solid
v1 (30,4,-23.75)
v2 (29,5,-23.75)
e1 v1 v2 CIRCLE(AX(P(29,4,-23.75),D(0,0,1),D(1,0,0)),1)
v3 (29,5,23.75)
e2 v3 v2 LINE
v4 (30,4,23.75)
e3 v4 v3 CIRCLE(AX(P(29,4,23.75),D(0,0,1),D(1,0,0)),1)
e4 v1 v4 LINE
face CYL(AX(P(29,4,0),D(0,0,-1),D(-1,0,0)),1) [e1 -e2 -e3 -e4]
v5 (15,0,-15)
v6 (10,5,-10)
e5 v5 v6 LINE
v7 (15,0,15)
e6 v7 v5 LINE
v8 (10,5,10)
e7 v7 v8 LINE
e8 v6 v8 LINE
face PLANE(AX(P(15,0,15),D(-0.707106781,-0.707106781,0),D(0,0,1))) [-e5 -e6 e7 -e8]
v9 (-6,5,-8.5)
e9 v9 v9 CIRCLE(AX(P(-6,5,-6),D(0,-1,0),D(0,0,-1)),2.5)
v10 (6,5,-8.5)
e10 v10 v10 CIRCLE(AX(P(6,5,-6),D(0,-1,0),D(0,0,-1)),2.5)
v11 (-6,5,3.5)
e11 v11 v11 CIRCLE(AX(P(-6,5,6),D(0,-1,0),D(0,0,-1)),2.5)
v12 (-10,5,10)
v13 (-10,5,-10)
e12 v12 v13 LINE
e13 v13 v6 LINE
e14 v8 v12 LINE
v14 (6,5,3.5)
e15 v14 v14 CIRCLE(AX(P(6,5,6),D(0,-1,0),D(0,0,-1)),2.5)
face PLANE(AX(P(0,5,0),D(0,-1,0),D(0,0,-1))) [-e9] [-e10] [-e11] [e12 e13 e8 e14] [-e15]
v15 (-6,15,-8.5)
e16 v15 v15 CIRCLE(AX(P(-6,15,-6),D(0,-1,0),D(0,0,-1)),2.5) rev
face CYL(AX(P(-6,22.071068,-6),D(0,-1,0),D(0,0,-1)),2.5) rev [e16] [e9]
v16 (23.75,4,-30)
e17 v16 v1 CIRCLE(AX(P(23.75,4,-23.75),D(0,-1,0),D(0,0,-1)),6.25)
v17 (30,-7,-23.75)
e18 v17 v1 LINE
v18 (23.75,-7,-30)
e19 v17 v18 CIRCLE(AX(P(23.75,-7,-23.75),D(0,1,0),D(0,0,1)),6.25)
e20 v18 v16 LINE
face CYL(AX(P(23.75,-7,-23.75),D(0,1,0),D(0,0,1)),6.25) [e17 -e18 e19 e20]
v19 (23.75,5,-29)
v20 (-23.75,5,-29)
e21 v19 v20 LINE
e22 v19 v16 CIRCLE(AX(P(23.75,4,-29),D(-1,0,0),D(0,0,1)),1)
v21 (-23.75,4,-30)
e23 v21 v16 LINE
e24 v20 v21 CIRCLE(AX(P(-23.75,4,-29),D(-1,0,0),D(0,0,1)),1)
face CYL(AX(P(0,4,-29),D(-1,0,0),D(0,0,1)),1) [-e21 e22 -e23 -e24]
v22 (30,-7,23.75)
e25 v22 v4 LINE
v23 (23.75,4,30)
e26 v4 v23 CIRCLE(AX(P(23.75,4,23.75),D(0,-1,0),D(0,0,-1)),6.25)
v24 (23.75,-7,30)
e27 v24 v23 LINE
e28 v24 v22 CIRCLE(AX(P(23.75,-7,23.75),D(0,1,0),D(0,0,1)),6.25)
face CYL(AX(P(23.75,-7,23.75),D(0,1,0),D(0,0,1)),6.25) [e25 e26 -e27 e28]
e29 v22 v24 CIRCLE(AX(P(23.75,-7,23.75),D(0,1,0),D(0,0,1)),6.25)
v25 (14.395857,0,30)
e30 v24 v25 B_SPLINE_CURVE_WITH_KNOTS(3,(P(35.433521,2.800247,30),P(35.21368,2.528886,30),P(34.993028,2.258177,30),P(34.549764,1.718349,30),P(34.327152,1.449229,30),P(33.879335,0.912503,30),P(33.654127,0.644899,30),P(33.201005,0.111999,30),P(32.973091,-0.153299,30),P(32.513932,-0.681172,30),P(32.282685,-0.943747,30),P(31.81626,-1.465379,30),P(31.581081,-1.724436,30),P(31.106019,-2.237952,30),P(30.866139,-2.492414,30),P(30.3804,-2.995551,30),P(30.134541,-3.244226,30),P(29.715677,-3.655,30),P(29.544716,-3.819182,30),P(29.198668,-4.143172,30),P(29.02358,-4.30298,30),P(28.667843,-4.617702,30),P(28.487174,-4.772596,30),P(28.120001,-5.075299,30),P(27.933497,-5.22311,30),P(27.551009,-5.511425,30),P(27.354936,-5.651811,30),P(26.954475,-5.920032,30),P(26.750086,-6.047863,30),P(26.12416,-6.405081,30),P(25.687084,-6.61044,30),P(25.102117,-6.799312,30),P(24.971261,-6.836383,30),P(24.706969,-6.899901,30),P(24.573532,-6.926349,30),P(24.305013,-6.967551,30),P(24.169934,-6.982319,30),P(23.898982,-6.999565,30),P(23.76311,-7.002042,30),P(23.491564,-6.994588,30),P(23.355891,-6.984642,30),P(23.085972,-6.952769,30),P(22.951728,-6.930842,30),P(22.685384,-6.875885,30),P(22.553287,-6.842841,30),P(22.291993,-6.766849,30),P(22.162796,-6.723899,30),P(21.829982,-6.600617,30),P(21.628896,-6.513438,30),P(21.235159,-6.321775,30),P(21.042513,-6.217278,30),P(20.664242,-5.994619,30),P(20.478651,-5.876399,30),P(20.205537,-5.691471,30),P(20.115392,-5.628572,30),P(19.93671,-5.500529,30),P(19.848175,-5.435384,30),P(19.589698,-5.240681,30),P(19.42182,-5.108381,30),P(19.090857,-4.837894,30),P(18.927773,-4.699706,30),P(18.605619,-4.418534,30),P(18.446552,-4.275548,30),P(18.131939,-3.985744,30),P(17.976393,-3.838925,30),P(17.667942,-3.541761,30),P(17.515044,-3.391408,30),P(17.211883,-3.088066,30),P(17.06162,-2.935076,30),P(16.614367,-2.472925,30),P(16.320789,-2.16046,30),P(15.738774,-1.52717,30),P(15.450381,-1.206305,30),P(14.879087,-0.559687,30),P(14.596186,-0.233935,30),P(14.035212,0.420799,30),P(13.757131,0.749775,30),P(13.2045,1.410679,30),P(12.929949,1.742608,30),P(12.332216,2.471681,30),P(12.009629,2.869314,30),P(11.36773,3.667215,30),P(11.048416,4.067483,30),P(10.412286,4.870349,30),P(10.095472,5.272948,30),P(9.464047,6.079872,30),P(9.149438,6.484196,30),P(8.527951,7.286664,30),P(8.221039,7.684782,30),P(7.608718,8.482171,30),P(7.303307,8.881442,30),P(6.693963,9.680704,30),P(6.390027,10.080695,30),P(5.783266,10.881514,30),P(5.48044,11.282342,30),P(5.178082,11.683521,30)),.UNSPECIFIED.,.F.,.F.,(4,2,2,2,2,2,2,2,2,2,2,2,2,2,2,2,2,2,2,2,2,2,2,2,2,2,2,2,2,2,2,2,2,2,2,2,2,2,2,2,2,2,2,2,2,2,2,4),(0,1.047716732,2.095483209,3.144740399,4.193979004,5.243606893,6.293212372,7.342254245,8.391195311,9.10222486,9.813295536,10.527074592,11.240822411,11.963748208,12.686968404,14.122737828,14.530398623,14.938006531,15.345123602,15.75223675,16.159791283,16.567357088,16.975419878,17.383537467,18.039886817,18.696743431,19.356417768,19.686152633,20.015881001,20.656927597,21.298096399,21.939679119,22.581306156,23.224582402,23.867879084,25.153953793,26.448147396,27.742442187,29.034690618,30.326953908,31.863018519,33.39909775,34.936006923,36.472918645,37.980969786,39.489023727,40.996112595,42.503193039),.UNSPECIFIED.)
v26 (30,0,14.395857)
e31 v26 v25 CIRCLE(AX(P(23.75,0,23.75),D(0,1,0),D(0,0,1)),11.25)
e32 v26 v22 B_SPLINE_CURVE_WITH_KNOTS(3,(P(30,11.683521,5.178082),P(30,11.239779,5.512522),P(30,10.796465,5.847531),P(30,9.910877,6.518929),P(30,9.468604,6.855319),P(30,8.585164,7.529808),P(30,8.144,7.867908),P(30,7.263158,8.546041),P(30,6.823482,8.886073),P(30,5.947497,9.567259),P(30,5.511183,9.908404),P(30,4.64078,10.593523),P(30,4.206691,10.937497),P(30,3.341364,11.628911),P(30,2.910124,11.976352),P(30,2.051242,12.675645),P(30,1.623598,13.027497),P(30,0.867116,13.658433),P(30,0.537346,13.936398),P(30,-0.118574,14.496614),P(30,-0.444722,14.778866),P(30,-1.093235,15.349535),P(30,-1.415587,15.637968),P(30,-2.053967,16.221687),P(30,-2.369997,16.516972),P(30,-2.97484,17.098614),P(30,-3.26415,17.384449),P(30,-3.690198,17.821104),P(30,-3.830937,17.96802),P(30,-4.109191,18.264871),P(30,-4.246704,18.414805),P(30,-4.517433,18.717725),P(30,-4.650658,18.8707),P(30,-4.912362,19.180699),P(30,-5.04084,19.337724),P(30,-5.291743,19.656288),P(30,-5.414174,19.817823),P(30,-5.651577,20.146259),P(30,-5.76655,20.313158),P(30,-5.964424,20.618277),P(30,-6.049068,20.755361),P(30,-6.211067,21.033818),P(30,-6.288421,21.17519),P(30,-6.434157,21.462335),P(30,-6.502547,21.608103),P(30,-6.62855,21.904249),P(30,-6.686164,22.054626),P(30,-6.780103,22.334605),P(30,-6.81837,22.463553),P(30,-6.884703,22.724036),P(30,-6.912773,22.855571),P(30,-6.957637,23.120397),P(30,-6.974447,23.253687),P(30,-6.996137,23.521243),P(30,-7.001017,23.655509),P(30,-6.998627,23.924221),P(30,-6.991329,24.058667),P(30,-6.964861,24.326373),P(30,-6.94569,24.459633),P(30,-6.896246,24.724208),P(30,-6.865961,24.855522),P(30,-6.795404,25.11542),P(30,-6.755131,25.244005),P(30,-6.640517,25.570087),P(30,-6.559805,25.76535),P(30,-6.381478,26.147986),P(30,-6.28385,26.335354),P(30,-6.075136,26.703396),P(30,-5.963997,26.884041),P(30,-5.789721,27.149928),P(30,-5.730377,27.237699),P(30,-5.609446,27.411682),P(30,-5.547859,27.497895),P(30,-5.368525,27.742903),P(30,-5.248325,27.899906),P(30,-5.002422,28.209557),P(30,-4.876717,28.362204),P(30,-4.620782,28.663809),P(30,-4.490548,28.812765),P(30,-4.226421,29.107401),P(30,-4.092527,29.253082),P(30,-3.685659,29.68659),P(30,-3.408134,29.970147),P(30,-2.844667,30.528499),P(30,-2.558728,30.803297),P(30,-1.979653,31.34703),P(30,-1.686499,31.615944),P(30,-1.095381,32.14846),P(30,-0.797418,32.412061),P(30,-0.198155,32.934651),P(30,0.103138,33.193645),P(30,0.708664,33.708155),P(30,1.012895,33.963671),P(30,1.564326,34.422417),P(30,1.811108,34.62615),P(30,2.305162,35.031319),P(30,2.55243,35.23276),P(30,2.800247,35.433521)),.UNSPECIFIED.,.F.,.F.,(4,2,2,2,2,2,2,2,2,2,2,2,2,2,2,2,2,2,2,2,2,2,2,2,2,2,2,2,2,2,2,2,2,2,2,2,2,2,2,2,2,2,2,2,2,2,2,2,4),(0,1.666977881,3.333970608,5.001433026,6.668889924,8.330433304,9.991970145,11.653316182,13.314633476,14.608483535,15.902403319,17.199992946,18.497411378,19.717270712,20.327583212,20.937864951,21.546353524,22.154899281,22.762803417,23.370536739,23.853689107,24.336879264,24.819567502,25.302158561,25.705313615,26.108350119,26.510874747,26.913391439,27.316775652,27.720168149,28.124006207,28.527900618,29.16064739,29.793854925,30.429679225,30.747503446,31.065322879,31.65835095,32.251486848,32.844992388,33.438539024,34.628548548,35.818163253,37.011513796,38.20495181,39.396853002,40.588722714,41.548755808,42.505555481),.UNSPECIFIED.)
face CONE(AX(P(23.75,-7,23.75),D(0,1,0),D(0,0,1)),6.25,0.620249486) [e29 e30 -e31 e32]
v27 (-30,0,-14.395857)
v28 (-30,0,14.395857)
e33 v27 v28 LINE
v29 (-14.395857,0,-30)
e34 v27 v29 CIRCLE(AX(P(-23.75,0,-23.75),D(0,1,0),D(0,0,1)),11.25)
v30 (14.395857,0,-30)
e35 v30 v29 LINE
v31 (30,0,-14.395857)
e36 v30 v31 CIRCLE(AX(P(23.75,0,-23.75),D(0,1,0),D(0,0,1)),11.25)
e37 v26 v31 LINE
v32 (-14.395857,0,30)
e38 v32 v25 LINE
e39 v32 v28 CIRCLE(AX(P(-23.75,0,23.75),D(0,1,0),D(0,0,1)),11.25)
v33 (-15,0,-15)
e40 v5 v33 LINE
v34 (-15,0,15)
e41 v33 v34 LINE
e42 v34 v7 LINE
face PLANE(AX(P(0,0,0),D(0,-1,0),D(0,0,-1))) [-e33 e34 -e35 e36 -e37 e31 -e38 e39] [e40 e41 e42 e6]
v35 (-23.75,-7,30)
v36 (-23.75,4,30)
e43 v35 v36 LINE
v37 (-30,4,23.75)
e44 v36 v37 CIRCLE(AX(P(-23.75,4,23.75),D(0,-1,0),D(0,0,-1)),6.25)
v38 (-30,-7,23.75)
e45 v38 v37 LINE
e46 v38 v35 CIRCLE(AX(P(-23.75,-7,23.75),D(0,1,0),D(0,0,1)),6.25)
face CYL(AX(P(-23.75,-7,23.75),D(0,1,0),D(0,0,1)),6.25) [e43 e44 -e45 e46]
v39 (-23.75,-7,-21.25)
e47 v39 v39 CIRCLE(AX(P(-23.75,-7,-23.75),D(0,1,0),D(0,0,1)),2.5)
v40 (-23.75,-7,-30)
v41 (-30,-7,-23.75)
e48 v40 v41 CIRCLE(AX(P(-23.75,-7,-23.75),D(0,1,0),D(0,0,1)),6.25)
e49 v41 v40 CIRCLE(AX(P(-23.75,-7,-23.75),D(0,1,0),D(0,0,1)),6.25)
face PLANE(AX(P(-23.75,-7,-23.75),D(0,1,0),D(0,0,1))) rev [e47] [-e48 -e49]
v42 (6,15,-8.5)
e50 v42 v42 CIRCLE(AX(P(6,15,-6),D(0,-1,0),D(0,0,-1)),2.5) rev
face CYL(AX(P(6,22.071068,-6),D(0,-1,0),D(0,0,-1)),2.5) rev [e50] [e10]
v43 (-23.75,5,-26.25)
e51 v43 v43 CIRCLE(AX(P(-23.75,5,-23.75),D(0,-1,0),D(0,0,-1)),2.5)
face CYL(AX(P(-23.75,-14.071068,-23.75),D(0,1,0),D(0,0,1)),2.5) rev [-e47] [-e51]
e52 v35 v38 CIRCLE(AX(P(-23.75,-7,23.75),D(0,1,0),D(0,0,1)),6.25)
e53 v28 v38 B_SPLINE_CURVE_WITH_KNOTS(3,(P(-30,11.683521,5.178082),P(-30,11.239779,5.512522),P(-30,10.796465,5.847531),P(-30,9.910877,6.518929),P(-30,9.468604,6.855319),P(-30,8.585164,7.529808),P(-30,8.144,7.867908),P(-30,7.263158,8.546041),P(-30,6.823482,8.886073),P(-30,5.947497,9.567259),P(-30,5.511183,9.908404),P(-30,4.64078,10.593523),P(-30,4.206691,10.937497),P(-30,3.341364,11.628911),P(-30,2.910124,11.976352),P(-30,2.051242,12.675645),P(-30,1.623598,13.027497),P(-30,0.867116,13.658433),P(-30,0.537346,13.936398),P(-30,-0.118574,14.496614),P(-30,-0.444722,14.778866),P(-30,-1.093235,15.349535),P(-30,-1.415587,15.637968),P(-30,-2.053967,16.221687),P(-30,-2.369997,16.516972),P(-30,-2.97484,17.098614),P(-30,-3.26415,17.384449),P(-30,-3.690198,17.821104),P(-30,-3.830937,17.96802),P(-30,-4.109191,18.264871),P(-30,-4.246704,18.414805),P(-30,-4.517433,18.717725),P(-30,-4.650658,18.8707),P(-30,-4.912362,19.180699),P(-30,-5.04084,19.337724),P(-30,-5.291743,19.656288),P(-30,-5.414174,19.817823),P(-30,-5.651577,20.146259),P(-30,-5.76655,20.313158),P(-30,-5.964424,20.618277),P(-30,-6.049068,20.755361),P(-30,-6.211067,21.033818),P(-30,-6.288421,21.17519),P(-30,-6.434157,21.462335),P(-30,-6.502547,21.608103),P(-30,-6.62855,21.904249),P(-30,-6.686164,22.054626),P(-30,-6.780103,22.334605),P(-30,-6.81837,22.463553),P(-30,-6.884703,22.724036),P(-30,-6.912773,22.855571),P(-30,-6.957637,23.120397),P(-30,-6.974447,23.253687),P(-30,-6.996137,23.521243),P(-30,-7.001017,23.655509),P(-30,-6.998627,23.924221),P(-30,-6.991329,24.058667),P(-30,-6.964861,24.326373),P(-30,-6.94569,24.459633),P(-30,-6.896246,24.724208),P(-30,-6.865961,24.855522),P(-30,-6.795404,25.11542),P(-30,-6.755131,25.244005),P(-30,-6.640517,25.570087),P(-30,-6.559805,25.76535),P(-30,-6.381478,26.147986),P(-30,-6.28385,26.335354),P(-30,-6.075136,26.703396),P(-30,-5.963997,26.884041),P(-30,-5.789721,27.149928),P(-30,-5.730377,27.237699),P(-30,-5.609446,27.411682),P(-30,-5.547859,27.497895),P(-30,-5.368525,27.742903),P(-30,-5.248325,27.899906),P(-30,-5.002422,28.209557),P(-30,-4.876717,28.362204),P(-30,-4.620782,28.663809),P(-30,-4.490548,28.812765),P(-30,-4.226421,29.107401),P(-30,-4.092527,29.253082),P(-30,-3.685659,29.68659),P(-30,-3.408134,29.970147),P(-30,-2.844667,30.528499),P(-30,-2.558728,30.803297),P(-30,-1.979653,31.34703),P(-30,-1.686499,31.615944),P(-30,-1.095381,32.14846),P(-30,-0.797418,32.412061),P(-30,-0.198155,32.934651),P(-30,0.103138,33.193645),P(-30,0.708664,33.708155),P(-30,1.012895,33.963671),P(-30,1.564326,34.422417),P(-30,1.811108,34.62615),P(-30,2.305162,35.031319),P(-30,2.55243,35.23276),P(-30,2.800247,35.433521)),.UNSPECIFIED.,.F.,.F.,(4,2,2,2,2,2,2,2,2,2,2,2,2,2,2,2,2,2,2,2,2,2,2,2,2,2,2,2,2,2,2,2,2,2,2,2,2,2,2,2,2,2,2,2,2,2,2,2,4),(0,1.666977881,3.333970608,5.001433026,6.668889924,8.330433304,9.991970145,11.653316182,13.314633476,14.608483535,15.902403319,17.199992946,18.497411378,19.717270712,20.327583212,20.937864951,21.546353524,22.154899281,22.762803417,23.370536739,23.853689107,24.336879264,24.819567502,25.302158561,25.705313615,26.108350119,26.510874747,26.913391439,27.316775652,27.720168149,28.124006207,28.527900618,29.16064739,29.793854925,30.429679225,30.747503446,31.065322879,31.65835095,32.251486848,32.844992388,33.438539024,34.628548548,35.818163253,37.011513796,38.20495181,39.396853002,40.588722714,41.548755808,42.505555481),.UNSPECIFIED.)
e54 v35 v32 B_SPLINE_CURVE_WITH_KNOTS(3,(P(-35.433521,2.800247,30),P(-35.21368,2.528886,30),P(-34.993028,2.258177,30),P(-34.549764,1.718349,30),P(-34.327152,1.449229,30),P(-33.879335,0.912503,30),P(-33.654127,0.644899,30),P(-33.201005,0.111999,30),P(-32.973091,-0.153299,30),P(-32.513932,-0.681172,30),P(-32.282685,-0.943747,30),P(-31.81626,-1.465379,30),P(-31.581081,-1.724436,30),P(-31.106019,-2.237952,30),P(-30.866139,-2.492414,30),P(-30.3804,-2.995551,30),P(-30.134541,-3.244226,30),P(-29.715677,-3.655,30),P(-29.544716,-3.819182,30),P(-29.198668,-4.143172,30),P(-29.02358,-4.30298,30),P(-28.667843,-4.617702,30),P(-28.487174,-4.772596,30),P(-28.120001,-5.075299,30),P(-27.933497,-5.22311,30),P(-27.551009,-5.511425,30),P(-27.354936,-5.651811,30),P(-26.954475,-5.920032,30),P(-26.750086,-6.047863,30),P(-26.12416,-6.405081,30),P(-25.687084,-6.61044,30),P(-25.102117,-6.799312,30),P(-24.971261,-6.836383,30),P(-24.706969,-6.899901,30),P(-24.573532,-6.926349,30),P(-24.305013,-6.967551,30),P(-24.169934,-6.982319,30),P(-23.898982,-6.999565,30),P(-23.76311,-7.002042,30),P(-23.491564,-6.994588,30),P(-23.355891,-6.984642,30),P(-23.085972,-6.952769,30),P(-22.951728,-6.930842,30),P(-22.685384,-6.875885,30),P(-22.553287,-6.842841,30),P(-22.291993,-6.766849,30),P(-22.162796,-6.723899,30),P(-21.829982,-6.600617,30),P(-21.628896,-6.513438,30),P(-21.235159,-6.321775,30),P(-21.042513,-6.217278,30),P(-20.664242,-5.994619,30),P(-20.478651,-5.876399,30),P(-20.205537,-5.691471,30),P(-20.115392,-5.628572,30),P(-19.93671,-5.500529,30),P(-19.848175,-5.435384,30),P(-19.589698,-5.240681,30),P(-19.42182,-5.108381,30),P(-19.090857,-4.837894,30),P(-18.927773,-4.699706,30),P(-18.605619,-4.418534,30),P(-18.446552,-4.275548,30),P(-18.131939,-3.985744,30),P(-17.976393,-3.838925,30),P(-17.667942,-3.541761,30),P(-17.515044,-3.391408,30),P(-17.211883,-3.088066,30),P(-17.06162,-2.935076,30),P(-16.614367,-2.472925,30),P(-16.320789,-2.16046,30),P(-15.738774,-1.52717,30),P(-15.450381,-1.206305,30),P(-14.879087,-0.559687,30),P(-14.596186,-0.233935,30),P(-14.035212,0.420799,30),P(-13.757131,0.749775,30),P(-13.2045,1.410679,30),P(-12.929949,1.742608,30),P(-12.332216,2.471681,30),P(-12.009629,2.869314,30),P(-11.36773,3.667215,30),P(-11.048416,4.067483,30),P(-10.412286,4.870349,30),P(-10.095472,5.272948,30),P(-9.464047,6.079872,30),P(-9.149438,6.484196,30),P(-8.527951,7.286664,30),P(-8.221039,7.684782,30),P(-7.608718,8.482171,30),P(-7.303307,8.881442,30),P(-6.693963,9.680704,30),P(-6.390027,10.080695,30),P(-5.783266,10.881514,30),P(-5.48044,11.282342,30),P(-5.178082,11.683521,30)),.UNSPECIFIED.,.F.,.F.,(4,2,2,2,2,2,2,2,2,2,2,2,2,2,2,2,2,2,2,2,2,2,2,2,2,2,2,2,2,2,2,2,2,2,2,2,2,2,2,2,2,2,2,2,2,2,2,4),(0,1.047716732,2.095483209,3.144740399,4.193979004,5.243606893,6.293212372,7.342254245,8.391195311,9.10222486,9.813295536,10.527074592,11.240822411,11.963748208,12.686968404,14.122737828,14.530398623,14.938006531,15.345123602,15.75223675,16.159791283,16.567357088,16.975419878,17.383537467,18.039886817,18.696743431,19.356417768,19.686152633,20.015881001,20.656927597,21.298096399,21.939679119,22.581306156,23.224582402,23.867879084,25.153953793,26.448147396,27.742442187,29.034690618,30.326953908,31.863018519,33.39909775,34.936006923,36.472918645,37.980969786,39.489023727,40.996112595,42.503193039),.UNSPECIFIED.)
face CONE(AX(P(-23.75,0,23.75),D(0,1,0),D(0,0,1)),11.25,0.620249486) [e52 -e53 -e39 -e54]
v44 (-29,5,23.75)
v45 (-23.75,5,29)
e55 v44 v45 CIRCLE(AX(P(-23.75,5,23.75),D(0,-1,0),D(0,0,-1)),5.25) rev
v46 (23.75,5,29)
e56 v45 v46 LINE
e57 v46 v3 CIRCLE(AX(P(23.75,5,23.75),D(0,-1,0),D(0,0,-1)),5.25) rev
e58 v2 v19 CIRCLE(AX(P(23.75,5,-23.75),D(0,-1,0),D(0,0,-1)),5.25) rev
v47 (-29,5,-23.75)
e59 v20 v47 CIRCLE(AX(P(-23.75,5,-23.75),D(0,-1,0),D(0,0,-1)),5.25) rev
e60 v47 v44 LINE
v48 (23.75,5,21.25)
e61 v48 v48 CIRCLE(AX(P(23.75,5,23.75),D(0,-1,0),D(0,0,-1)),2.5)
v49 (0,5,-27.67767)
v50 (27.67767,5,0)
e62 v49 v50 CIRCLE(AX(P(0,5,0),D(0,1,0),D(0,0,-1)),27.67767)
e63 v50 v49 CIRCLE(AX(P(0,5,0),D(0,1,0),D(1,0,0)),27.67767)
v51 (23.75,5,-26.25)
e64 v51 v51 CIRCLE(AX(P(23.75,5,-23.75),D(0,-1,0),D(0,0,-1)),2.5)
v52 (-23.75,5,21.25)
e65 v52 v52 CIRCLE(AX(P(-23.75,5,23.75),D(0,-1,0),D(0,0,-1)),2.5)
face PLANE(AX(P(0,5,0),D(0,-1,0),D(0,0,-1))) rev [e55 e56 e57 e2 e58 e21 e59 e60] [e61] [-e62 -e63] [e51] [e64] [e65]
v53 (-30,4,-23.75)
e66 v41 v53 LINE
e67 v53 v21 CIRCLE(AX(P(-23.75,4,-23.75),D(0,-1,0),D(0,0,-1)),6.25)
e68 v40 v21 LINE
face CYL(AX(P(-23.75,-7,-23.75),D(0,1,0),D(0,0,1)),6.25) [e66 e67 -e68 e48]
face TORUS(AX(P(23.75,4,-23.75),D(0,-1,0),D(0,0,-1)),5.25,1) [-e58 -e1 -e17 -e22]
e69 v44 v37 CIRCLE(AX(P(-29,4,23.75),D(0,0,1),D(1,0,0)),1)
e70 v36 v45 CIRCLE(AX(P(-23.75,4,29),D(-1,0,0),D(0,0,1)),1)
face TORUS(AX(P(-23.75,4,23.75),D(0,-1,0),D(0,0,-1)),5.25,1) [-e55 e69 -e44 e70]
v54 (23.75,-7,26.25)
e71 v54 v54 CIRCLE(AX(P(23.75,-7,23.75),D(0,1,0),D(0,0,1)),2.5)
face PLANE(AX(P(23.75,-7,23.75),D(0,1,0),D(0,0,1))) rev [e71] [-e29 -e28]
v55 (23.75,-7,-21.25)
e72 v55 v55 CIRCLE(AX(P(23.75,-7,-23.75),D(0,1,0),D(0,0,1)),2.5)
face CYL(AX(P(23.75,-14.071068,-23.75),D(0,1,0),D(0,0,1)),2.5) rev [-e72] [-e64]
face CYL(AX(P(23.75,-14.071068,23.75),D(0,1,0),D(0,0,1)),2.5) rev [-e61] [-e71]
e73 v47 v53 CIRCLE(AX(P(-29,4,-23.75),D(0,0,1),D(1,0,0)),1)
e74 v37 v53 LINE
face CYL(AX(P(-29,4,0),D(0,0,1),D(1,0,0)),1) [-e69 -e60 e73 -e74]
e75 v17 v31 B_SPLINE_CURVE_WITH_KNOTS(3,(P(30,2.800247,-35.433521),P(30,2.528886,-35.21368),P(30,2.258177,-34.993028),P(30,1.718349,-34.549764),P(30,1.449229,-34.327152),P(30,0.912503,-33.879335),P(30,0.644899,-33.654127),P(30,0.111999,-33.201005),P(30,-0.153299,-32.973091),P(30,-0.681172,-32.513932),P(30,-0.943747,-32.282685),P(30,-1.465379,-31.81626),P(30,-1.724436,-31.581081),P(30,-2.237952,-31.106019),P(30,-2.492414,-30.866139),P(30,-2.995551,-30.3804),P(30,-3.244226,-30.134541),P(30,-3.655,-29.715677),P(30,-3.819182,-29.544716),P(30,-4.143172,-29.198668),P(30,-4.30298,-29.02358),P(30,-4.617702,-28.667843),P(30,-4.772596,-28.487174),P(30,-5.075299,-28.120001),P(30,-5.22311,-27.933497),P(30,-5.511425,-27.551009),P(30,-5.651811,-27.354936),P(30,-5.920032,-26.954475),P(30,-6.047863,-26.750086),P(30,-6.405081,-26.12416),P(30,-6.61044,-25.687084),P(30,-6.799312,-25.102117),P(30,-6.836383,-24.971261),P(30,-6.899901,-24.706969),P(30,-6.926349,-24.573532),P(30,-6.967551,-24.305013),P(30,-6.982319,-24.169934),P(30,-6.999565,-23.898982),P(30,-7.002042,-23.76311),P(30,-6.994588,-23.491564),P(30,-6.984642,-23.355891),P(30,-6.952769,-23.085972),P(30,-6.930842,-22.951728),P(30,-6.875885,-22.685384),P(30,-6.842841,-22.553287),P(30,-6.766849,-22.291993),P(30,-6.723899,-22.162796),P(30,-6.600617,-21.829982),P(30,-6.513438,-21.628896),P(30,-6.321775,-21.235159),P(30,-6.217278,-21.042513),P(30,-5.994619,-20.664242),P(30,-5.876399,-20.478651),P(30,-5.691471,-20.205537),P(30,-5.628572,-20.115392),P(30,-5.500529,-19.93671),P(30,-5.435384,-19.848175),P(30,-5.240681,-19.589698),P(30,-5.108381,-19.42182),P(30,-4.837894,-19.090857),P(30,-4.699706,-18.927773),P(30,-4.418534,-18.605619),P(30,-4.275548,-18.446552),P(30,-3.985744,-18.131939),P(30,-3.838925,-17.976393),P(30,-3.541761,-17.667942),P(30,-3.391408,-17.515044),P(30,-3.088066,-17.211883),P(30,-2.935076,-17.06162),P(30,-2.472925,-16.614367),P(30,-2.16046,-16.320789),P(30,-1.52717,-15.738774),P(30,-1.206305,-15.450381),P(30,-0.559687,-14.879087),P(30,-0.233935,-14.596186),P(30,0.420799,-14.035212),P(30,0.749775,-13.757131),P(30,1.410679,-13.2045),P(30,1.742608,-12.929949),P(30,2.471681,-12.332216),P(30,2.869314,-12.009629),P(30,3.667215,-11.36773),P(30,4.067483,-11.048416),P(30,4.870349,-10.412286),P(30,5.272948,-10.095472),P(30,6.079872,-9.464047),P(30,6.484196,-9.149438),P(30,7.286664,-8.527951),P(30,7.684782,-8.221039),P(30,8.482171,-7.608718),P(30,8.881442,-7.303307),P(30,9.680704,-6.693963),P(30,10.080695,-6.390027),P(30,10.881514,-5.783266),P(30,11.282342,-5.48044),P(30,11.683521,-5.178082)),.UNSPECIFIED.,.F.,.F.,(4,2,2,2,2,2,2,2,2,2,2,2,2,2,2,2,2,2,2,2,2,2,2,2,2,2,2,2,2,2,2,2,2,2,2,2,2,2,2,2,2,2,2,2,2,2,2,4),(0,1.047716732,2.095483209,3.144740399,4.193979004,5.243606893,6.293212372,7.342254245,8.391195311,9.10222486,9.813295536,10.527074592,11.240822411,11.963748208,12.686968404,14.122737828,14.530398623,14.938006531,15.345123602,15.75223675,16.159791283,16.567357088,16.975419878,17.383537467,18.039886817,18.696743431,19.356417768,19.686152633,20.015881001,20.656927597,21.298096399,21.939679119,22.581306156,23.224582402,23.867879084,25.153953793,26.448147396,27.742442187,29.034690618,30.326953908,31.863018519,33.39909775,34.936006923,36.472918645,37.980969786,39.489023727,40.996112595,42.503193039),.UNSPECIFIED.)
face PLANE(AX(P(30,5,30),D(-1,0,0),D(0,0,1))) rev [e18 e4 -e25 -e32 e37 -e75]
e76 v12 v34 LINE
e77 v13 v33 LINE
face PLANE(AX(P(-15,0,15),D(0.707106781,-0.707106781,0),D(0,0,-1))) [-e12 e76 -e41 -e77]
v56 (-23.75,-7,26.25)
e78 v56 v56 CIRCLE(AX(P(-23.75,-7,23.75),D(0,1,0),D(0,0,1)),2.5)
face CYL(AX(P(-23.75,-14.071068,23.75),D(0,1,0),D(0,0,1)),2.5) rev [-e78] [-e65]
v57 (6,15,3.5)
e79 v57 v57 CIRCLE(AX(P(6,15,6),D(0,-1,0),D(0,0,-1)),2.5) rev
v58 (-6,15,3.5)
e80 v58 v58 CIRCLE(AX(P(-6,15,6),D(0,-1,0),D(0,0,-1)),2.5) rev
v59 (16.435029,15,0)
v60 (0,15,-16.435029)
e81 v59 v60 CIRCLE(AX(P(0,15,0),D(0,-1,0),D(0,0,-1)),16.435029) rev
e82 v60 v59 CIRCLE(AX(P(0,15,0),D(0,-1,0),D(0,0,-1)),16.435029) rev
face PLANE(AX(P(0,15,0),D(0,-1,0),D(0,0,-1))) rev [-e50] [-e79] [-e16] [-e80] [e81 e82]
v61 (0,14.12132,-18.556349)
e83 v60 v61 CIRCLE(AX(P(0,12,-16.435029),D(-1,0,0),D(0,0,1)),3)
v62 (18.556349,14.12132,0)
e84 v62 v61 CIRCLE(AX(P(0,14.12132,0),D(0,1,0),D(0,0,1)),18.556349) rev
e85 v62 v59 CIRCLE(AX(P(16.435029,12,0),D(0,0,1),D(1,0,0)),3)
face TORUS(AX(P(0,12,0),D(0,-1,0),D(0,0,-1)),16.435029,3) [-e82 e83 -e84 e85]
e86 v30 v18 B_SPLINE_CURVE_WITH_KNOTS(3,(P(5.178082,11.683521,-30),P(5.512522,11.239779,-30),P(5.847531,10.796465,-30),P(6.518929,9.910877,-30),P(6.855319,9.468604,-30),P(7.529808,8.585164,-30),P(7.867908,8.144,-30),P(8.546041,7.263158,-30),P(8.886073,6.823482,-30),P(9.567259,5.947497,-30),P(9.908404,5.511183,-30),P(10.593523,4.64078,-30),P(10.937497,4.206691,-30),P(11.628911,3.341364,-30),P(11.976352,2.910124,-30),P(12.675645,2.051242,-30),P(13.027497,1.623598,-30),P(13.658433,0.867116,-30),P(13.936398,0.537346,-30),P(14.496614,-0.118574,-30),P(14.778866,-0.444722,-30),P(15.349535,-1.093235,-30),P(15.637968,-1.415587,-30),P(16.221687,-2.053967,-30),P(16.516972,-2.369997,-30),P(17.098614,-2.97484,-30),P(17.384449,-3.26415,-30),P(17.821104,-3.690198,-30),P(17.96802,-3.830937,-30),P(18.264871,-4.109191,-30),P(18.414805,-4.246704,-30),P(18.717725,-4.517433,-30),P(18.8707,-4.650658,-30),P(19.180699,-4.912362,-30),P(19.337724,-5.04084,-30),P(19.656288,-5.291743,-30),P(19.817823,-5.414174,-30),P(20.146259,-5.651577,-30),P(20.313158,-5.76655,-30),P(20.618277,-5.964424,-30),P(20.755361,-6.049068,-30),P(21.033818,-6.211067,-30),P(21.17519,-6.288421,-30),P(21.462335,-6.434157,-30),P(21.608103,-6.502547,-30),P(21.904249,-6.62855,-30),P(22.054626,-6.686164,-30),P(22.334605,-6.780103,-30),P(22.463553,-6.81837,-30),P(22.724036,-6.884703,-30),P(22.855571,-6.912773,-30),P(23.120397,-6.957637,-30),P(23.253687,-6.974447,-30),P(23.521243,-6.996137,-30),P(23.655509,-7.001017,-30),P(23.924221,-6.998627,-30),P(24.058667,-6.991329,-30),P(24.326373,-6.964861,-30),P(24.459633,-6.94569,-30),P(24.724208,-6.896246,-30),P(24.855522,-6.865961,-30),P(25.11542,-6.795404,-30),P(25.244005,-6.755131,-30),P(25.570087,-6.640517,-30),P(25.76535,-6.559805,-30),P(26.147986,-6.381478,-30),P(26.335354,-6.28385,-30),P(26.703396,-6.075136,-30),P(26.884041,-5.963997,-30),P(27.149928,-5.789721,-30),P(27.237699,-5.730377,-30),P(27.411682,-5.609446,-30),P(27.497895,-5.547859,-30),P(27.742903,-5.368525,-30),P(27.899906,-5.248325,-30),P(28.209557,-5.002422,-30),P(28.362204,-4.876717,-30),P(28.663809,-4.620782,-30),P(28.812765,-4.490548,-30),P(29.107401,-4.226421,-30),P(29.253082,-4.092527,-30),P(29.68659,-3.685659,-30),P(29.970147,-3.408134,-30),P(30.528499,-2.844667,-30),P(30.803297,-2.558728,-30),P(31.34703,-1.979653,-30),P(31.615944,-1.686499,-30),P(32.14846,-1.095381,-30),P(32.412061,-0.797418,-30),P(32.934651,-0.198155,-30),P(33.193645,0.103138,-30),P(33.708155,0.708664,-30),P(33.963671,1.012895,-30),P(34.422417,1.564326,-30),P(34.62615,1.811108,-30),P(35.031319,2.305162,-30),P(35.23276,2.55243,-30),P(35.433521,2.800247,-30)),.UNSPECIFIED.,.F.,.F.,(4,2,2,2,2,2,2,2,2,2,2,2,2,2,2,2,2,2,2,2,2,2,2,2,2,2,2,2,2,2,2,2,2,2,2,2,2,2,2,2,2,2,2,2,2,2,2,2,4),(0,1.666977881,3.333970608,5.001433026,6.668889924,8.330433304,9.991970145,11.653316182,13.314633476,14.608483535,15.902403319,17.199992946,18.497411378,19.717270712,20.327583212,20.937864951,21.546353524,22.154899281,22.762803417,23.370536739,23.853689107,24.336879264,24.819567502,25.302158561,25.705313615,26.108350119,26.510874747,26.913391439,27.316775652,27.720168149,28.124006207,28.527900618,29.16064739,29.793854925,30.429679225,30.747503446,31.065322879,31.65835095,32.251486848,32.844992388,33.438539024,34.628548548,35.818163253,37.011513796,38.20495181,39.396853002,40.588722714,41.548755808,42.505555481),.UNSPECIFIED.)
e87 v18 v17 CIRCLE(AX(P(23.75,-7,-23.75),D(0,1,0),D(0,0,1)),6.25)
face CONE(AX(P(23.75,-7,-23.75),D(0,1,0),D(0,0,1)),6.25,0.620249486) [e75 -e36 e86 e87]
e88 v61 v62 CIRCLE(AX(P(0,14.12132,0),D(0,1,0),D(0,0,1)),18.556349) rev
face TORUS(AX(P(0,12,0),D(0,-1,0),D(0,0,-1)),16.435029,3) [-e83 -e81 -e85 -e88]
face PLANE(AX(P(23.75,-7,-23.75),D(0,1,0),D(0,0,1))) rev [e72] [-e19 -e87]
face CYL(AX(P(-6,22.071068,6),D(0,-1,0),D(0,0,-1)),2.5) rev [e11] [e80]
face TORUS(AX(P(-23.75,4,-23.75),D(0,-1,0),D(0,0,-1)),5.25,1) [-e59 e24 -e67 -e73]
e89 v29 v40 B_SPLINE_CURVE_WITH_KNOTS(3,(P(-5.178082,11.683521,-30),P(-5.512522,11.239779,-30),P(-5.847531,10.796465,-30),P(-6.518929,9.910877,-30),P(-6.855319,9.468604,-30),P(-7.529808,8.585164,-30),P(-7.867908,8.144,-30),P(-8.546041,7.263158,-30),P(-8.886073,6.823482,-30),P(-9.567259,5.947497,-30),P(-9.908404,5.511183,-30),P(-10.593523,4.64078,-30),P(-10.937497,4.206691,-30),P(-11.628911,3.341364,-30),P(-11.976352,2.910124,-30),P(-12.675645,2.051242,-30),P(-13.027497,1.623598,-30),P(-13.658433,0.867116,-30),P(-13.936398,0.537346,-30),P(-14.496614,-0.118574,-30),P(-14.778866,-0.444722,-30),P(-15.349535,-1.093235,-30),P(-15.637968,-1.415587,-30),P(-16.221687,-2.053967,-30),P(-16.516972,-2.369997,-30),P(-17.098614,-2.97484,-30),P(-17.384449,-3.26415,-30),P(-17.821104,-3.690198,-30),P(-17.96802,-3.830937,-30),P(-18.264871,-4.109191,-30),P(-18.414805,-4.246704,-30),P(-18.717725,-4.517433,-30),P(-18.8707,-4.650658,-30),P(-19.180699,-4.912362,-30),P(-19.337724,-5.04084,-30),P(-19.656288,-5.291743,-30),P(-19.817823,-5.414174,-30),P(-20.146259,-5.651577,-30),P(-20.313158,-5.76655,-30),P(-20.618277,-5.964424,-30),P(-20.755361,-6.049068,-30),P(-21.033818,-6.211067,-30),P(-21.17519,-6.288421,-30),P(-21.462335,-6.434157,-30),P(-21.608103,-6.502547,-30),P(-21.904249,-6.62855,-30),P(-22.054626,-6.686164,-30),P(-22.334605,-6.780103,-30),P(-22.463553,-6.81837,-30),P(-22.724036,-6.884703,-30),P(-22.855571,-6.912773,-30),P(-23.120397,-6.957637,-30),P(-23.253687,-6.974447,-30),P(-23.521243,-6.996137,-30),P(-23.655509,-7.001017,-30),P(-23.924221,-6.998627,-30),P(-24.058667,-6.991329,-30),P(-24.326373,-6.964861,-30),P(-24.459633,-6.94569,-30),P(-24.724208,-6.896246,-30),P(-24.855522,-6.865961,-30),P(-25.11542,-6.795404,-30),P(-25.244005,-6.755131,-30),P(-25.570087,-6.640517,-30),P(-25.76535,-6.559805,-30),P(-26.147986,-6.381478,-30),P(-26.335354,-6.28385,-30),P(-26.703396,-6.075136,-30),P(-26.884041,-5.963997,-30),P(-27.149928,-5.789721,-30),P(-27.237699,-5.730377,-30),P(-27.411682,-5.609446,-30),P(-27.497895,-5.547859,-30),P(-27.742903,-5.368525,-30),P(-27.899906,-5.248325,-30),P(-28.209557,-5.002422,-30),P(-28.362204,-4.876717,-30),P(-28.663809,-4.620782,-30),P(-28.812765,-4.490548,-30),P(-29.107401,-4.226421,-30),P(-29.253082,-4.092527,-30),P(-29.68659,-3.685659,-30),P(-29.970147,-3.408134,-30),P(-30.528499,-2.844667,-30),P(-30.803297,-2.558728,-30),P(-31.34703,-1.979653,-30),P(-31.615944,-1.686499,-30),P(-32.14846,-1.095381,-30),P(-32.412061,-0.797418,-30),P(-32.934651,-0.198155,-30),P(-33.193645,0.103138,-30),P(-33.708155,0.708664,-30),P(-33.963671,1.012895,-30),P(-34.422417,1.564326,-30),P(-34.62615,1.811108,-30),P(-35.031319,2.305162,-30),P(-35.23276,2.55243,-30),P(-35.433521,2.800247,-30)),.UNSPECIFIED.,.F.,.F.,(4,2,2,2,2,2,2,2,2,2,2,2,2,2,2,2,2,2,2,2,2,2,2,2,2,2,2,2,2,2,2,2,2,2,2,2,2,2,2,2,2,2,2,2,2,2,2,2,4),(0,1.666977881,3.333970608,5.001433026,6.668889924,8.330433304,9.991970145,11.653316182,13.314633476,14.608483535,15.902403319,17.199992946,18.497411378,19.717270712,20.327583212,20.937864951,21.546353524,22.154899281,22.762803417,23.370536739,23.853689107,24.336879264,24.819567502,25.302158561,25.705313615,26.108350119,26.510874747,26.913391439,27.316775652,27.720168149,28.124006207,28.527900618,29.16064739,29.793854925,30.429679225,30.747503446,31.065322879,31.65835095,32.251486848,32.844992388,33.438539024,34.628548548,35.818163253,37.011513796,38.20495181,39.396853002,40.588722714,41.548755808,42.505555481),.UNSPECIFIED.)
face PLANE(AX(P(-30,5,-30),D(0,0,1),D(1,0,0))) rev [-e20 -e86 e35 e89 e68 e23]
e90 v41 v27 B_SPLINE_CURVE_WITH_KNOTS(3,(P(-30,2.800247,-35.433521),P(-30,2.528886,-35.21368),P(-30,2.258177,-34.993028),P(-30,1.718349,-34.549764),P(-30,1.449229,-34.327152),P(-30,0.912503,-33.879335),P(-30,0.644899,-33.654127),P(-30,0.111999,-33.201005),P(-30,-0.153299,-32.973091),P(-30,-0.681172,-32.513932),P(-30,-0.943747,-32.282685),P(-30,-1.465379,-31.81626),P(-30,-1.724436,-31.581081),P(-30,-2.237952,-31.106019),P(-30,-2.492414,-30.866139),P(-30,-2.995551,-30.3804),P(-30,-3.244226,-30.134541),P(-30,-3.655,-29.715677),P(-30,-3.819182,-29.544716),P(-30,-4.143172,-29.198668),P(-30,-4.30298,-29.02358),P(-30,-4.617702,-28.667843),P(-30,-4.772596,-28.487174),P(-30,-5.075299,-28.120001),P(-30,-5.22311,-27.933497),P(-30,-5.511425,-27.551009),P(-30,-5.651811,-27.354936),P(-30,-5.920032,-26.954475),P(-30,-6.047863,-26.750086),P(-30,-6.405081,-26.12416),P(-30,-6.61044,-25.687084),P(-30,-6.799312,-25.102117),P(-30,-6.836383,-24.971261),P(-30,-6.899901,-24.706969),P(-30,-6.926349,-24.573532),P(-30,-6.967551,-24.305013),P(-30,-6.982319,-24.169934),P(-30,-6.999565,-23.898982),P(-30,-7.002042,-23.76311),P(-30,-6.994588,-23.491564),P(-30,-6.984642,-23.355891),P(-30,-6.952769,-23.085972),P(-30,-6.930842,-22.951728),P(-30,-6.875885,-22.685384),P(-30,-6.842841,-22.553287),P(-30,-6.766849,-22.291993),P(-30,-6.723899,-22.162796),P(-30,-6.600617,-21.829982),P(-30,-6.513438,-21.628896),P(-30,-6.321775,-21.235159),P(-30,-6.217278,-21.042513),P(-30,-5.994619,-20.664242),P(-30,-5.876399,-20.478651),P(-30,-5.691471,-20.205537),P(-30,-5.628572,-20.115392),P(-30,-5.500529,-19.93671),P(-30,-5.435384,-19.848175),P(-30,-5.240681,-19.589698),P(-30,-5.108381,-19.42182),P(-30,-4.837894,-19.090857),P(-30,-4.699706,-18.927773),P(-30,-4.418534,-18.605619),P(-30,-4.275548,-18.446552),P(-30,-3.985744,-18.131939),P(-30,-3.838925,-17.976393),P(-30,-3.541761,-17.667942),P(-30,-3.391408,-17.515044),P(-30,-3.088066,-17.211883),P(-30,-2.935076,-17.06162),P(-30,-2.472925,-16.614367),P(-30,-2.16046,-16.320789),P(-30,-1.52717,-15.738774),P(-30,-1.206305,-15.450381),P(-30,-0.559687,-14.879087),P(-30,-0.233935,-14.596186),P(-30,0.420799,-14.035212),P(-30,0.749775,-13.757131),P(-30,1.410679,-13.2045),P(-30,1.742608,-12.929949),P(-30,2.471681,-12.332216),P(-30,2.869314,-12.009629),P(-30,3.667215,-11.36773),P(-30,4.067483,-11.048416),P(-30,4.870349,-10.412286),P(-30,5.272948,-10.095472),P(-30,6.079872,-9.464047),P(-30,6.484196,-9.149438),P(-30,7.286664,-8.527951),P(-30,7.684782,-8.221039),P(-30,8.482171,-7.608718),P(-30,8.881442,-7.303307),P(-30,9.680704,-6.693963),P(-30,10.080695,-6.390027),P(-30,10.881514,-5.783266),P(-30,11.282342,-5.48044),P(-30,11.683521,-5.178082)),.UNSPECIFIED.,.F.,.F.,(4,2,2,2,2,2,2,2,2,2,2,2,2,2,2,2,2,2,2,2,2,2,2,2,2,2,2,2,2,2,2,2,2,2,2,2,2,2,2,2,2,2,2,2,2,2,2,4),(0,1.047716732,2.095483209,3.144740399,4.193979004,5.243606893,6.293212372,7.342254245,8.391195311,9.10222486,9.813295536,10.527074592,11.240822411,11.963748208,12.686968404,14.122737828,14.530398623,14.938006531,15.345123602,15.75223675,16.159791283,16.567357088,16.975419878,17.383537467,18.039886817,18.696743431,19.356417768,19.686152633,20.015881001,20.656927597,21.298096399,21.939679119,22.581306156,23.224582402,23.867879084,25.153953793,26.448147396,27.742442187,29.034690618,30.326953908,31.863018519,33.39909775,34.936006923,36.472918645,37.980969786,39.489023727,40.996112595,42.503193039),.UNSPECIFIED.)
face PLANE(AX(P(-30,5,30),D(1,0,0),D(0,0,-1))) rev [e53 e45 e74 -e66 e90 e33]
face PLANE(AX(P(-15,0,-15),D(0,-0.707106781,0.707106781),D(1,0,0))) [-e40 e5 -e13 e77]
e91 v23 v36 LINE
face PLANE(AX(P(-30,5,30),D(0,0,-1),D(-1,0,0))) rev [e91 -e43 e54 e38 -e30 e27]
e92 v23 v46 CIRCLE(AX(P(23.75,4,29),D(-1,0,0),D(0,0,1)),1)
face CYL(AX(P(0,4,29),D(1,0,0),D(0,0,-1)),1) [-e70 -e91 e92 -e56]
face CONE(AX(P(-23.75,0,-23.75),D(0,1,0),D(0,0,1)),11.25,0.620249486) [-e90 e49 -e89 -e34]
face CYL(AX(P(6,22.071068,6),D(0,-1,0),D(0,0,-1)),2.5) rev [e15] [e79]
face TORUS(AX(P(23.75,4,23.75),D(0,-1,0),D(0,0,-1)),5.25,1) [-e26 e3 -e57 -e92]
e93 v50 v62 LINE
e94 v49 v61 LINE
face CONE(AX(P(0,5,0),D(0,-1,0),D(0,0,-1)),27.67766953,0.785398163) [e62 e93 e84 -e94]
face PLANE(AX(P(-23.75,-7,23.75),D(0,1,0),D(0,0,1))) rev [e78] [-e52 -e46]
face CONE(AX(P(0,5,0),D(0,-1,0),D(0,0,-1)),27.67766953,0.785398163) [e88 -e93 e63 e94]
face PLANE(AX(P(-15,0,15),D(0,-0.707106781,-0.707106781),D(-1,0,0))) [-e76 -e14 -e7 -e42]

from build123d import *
from build123d.topology import SkipClean

# Parameters (mm, degrees)
SKETCH_1_W          = 60
SKETCH_1_H          = 60
EXTRUDE_1_DEPTH     = 5
EXTRUDE_START       = 5
SKETCH_2_R          = 17.67766953
EXTRUDE_3_DEPTH     = 10
SKETCH_6_W          = 30
SKETCH_6_H          = 30
CUT_EXTRUDE_2_DEPTH = 5
CHAMFER_1_SIZE      = 5
SKETCH_7_R          = 6.25
EXTRUDE_4_DEPTH     = 7
CUT_EXTRUDE_START   = 5
CUT_EXTRUDE_3_DEPTH = 5
CUT_EXTRUDE_4_DEPTH = 7
SKETCH_18_R         = 2.5
CUT_EXTRUDE_5_DEPTH = 12
SKETCH_21_R         = 2.5
CUT_EXTRUDE_6_DEPTH = 10
FILLET_1_R          = 1
FILLET_2_R          = 3


with BuildPart() as part:
    # 草图1 → 凸台-拉伸1 (new body)
    with BuildSketch(Plane(origin=(0, 0, 0), x_dir=(1, 0, 0), z_dir=(0, 1, 0))):
        Rectangle(SKETCH_1_W, SKETCH_1_H)
    extrude(amount=EXTRUDE_1_DEPTH)

    # 草图2 → 凸台-拉伸3 (add)
    with BuildSketch(Plane(origin=(0, 0, 0), x_dir=(1, 0, 0), z_dir=(0, 1, 0)).offset(EXTRUDE_START)):
        with Locations(Location((0, 0, 0), (0, 0, 90))):
            Circle(SKETCH_2_R)
    extrude(amount=EXTRUDE_3_DEPTH)

    # 扫描1: sweep along a curve in space
    with BuildLine() as sweep_1_path:
        ThreePointArc((0, 5, -17.67766953), (12.5, 5, -12.5), (17.67766953, 5, 0))
        ThreePointArc((17.67766953, 5, 0), (12.5, 5, 12.5), (0, 5, 17.67766953))
        ThreePointArc((0, 5, 17.67766953), (-12.5, 5, 12.5), (-17.67766953, 5, 0))
        ThreePointArc((-17.67766953, 5, 0), (-12.5, 5, -12.5), (0, 5, -17.67766953))
    # 草图4 → 扫描1 (sweep)
    with BuildSketch(Plane.XY):
        Polygon((17.67766953, 15), (17.67766953, 5), (27.67766953, 5), align=None)
    sweep(path=sweep_1_path.line)

    # 草图6 → 切除-拉伸2 (cut)
    with BuildSketch(Plane(origin=(0, 0, 0), x_dir=(1, 0, 0), z_dir=(0, 1, 0))):
        Rectangle(SKETCH_6_W, SKETCH_6_H)
    extrude(amount=CUT_EXTRUDE_2_DEPTH, mode=Mode.SUBTRACT)

    # 倒角1
    chamfer_1_edges = [part.edges().sort_by_distance(p)[0] for p in [
        (0, 5, -15),
        (-15, 5, 0),
        (0, 5, 15),
        (15, 5, 0),
    ]]
    chamfer(chamfer_1_edges, length=CHAMFER_1_SIZE - 0.0001)  # a hair under: the kernel refuses the full size

    # 草图7 → 凸台-拉伸4 (add)
    with BuildSketch(Plane(origin=(0, 0, 0), x_dir=(1, 0, 0), z_dir=(0, 1, 0))):
        with Locations(Location((-23.75, 23.75, 0), (0, 0, 270))):
            Circle(SKETCH_7_R)
        with Locations(Location((23.75, 23.75, 0), (0, 0, 270))):
            Circle(SKETCH_7_R)
        with Locations(Location((-23.75, -23.75, 0), (0, 0, 270))):
            Circle(SKETCH_7_R)
        with Locations(Location((23.75, -23.75, 0), (0, 0, 270))):
            Circle(SKETCH_7_R)
    extrude(amount=-EXTRUDE_4_DEPTH)

    # 草图8 → 切除-拉伸3 (cut)
    with BuildSketch(Plane(origin=(0, 0, 0), x_dir=(1, 0, 0), z_dir=(0, 1, 0)).offset(CUT_EXTRUDE_START)):
        with BuildLine():
            Line((23.75, 30), (30, 30))
            Line((30, 30), (30, 23.75))
            ThreePointArc((30, 23.75), (28.169417382, 28.169417382), (23.75, 30))
        make_face()
        with BuildLine():
            Line((-30, 30), (-23.75, 30))
            ThreePointArc((-23.75, 30), (-28.169417382, 28.169417382), (-30, 23.75))
            Line((-30, 23.75), (-30, 30))
        make_face()
        with BuildLine():
            Line((-23.75, -30), (-30, -30))
            Line((-30, -30), (-30, -23.75))
            ThreePointArc((-30, -23.75), (-28.169417382, -28.169417382), (-23.75, -30))
        make_face()
        with BuildLine():
            Line((30, -23.75), (30, -30))
            Line((30, -30), (23.75, -30))
            ThreePointArc((23.75, -30), (28.169417382, -28.169417382), (30, -23.75))
        make_face()
    extrude(amount=-CUT_EXTRUDE_3_DEPTH, mode=Mode.SUBTRACT)

    # 草图9 → 旋转1 (revolve)
    with BuildSketch(Plane(origin=(0, 0, 23.75), x_dir=(-1, 0, 0), z_dir=(0, 0, -1)), mode=Mode.PRIVATE) as revolve_1_sk:
        Polygon((17.5, -7), (17.5, 0), (12.5, 0), align=None)
    revolve(revolve_1_sk.sketch.rotate(Axis((-23.75, 5, 23.75), (0, -1, 0)), 90), axis=Axis((-23.75, 5, 23.75), (0, -1, 0)))

    # 草图13 → 旋转2 (revolve)
    with BuildSketch(Plane(origin=(0, 0, 23.75), x_dir=(-1, 0, 0), z_dir=(0, 0, -1)), mode=Mode.PRIVATE) as revolve_2_sk:
        Polygon((-17.5, 0), (-17.5, -7), (-12.5, 0), align=None)
    revolve(revolve_2_sk.sketch.rotate(Axis((23.75, 5, 23.75), (0, -1, 0)), 270), axis=Axis((23.75, 5, 23.75), (0, -1, 0)))

    # 草图14 → 旋转3 (revolve)
    with BuildSketch(Plane(origin=(0, 0, -23.75), x_dir=(-1, 0, 0), z_dir=(0, 0, -1)), mode=Mode.PRIVATE) as revolve_3_sk:
        Polygon((-17.5, -7), (-12.5, 0), (-17.5, 0), align=None)
    revolve(revolve_3_sk.sketch.rotate(Axis((23.75, 5, -23.75), (0, -1, 0)), 270), axis=Axis((23.75, 5, -23.75), (0, -1, 0)))

    # 草图16 → 旋转4 (revolve)
    with BuildSketch(Plane(origin=(0, 0, -23.75), x_dir=(-1, 0, 0), z_dir=(0, 0, -1)), mode=Mode.PRIVATE) as revolve_4_sk:
        Polygon((17.5, 0), (17.5, -7), (12.5, 0), align=None)
    revolve(revolve_4_sk.sketch.rotate(Axis((-23.75, 5, -23.75), (0, -1, 0)), 90), axis=Axis((-23.75, 5, -23.75), (0, -1, 0)))

    # 草图17 → 切除-拉伸4 (cut)
    with SkipClean():  # the faces are left unmerged after this step: merging them gives an invalid solid
        with BuildSketch(Plane(origin=(0, 0, 0), x_dir=(1, 0, 0), z_dir=(0, 1, 0))):
            with BuildLine():
                Line((-30, -23.75), (-30, -14.395856533))
                ThreePointArc((-30, -14.395856533), (-31.704951288, -31.704951288), (-14.395856533, -30))
                Line((-14.395856533, -30), (-23.75, -30))
                ThreePointArc((-23.75, -30), (-28.169417382, -28.169417382), (-30, -23.75))
            make_face()
            with BuildLine():
                Line((30, -14.395856533), (30, -23.75))
                ThreePointArc((30, -23.75), (28.169417382, -28.169417382), (23.75, -30))
                Line((23.75, -30), (14.395856533, -30))
                ThreePointArc((14.395856533, -30), (31.704951288, -31.704951288), (30, -14.395856533))
            make_face()
            with BuildLine():
                Line((30, 23.75), (30, 14.395856533))
                ThreePointArc((30, 14.395856533), (31.704951288, 31.704951288), (14.395856533, 30))
                Line((14.395856533, 30), (23.75, 30))
                ThreePointArc((23.75, 30), (28.169417382, 28.169417382), (30, 23.75))
            make_face()
            with BuildLine():
                Line((-23.75, 30), (-14.395856533, 30))
                ThreePointArc((-14.395856533, 30), (-31.704951288, 31.704951288), (-30, 14.395856533))
                Line((-30, 14.395856533), (-30, 23.75))
                ThreePointArc((-30, 23.75), (-28.169417382, 28.169417382), (-23.75, 30))
            make_face()
        extrude(amount=-CUT_EXTRUDE_4_DEPTH, mode=Mode.SUBTRACT)

    # 草图18 → 切除-拉伸5 (cut)
    with SkipClean():  # the faces are left unmerged after this step: merging them gives an invalid solid
        with BuildSketch(Plane(origin=(0, 0, 0), x_dir=(1, 0, 0), z_dir=(0, 1, 0)).offset(CUT_EXTRUDE_START)):
            with Locations(Location((-23.75, 23.75, 0), (0, 0, 270))):
                Circle(SKETCH_18_R)
            with Locations(Location((23.75, 23.75, 0), (0, 0, 270))):
                Circle(SKETCH_18_R)
            with Locations(Location((-23.75, -23.75, 0), (0, 0, 270))):
                Circle(SKETCH_18_R)
            with Locations(Location((23.75, -23.75, 0), (0, 0, 270))):
                Circle(SKETCH_18_R)
        extrude(amount=-CUT_EXTRUDE_5_DEPTH, mode=Mode.SUBTRACT)

    # 草图21 → 切除-拉伸6 (cut)
    with SkipClean():  # the faces are left unmerged after this step: merging them gives an invalid solid
        with BuildSketch(Plane(origin=(0, 0, 0), x_dir=(1, 0, 0), z_dir=(0, 1, 0)).offset(CUT_EXTRUDE_START)):
            with Locations(Location((-6, 6, 0), (0, 0, 90))):
                Circle(SKETCH_21_R)
            with Locations(Location((6, 6, 0), (0, 0, 90))):
                Circle(SKETCH_21_R)
            with Locations(Location((6, -6, 0), (0, 0, 90))):
                Circle(SKETCH_21_R)
            with Locations(Location((-6, -6, 0), (0, 0, 90))):
                Circle(SKETCH_21_R)
        extrude(amount=CUT_EXTRUDE_6_DEPTH, mode=Mode.SUBTRACT)

    # 圆角1
    fillet_1_edges = [part.edges().sort_by_distance(p)[0] for p in [
        (0, 5, 30),
        (-30, 5, 0),
        (0, 5, -30),
        (30, 5, 0),
        (28.169417382, 5, 28.169417382),
        (-28.169417382, 5, 28.169417382),
        (-28.169417382, 5, -28.169417382),
        (28.169417382, 5, -28.169417382),
    ]]
    fillet(fillet_1_edges, radius=FILLET_1_R)

    # 圆角2
    fillet_2_edges = [part.edges().sort_by_distance(p)[0] for p in [
        (0, 15, -17.67766953),
        (-12.5, 15, 12.5),
    ]]
    fillet(fillet_2_edges, radius=FILLET_2_R)


solid = part.part
